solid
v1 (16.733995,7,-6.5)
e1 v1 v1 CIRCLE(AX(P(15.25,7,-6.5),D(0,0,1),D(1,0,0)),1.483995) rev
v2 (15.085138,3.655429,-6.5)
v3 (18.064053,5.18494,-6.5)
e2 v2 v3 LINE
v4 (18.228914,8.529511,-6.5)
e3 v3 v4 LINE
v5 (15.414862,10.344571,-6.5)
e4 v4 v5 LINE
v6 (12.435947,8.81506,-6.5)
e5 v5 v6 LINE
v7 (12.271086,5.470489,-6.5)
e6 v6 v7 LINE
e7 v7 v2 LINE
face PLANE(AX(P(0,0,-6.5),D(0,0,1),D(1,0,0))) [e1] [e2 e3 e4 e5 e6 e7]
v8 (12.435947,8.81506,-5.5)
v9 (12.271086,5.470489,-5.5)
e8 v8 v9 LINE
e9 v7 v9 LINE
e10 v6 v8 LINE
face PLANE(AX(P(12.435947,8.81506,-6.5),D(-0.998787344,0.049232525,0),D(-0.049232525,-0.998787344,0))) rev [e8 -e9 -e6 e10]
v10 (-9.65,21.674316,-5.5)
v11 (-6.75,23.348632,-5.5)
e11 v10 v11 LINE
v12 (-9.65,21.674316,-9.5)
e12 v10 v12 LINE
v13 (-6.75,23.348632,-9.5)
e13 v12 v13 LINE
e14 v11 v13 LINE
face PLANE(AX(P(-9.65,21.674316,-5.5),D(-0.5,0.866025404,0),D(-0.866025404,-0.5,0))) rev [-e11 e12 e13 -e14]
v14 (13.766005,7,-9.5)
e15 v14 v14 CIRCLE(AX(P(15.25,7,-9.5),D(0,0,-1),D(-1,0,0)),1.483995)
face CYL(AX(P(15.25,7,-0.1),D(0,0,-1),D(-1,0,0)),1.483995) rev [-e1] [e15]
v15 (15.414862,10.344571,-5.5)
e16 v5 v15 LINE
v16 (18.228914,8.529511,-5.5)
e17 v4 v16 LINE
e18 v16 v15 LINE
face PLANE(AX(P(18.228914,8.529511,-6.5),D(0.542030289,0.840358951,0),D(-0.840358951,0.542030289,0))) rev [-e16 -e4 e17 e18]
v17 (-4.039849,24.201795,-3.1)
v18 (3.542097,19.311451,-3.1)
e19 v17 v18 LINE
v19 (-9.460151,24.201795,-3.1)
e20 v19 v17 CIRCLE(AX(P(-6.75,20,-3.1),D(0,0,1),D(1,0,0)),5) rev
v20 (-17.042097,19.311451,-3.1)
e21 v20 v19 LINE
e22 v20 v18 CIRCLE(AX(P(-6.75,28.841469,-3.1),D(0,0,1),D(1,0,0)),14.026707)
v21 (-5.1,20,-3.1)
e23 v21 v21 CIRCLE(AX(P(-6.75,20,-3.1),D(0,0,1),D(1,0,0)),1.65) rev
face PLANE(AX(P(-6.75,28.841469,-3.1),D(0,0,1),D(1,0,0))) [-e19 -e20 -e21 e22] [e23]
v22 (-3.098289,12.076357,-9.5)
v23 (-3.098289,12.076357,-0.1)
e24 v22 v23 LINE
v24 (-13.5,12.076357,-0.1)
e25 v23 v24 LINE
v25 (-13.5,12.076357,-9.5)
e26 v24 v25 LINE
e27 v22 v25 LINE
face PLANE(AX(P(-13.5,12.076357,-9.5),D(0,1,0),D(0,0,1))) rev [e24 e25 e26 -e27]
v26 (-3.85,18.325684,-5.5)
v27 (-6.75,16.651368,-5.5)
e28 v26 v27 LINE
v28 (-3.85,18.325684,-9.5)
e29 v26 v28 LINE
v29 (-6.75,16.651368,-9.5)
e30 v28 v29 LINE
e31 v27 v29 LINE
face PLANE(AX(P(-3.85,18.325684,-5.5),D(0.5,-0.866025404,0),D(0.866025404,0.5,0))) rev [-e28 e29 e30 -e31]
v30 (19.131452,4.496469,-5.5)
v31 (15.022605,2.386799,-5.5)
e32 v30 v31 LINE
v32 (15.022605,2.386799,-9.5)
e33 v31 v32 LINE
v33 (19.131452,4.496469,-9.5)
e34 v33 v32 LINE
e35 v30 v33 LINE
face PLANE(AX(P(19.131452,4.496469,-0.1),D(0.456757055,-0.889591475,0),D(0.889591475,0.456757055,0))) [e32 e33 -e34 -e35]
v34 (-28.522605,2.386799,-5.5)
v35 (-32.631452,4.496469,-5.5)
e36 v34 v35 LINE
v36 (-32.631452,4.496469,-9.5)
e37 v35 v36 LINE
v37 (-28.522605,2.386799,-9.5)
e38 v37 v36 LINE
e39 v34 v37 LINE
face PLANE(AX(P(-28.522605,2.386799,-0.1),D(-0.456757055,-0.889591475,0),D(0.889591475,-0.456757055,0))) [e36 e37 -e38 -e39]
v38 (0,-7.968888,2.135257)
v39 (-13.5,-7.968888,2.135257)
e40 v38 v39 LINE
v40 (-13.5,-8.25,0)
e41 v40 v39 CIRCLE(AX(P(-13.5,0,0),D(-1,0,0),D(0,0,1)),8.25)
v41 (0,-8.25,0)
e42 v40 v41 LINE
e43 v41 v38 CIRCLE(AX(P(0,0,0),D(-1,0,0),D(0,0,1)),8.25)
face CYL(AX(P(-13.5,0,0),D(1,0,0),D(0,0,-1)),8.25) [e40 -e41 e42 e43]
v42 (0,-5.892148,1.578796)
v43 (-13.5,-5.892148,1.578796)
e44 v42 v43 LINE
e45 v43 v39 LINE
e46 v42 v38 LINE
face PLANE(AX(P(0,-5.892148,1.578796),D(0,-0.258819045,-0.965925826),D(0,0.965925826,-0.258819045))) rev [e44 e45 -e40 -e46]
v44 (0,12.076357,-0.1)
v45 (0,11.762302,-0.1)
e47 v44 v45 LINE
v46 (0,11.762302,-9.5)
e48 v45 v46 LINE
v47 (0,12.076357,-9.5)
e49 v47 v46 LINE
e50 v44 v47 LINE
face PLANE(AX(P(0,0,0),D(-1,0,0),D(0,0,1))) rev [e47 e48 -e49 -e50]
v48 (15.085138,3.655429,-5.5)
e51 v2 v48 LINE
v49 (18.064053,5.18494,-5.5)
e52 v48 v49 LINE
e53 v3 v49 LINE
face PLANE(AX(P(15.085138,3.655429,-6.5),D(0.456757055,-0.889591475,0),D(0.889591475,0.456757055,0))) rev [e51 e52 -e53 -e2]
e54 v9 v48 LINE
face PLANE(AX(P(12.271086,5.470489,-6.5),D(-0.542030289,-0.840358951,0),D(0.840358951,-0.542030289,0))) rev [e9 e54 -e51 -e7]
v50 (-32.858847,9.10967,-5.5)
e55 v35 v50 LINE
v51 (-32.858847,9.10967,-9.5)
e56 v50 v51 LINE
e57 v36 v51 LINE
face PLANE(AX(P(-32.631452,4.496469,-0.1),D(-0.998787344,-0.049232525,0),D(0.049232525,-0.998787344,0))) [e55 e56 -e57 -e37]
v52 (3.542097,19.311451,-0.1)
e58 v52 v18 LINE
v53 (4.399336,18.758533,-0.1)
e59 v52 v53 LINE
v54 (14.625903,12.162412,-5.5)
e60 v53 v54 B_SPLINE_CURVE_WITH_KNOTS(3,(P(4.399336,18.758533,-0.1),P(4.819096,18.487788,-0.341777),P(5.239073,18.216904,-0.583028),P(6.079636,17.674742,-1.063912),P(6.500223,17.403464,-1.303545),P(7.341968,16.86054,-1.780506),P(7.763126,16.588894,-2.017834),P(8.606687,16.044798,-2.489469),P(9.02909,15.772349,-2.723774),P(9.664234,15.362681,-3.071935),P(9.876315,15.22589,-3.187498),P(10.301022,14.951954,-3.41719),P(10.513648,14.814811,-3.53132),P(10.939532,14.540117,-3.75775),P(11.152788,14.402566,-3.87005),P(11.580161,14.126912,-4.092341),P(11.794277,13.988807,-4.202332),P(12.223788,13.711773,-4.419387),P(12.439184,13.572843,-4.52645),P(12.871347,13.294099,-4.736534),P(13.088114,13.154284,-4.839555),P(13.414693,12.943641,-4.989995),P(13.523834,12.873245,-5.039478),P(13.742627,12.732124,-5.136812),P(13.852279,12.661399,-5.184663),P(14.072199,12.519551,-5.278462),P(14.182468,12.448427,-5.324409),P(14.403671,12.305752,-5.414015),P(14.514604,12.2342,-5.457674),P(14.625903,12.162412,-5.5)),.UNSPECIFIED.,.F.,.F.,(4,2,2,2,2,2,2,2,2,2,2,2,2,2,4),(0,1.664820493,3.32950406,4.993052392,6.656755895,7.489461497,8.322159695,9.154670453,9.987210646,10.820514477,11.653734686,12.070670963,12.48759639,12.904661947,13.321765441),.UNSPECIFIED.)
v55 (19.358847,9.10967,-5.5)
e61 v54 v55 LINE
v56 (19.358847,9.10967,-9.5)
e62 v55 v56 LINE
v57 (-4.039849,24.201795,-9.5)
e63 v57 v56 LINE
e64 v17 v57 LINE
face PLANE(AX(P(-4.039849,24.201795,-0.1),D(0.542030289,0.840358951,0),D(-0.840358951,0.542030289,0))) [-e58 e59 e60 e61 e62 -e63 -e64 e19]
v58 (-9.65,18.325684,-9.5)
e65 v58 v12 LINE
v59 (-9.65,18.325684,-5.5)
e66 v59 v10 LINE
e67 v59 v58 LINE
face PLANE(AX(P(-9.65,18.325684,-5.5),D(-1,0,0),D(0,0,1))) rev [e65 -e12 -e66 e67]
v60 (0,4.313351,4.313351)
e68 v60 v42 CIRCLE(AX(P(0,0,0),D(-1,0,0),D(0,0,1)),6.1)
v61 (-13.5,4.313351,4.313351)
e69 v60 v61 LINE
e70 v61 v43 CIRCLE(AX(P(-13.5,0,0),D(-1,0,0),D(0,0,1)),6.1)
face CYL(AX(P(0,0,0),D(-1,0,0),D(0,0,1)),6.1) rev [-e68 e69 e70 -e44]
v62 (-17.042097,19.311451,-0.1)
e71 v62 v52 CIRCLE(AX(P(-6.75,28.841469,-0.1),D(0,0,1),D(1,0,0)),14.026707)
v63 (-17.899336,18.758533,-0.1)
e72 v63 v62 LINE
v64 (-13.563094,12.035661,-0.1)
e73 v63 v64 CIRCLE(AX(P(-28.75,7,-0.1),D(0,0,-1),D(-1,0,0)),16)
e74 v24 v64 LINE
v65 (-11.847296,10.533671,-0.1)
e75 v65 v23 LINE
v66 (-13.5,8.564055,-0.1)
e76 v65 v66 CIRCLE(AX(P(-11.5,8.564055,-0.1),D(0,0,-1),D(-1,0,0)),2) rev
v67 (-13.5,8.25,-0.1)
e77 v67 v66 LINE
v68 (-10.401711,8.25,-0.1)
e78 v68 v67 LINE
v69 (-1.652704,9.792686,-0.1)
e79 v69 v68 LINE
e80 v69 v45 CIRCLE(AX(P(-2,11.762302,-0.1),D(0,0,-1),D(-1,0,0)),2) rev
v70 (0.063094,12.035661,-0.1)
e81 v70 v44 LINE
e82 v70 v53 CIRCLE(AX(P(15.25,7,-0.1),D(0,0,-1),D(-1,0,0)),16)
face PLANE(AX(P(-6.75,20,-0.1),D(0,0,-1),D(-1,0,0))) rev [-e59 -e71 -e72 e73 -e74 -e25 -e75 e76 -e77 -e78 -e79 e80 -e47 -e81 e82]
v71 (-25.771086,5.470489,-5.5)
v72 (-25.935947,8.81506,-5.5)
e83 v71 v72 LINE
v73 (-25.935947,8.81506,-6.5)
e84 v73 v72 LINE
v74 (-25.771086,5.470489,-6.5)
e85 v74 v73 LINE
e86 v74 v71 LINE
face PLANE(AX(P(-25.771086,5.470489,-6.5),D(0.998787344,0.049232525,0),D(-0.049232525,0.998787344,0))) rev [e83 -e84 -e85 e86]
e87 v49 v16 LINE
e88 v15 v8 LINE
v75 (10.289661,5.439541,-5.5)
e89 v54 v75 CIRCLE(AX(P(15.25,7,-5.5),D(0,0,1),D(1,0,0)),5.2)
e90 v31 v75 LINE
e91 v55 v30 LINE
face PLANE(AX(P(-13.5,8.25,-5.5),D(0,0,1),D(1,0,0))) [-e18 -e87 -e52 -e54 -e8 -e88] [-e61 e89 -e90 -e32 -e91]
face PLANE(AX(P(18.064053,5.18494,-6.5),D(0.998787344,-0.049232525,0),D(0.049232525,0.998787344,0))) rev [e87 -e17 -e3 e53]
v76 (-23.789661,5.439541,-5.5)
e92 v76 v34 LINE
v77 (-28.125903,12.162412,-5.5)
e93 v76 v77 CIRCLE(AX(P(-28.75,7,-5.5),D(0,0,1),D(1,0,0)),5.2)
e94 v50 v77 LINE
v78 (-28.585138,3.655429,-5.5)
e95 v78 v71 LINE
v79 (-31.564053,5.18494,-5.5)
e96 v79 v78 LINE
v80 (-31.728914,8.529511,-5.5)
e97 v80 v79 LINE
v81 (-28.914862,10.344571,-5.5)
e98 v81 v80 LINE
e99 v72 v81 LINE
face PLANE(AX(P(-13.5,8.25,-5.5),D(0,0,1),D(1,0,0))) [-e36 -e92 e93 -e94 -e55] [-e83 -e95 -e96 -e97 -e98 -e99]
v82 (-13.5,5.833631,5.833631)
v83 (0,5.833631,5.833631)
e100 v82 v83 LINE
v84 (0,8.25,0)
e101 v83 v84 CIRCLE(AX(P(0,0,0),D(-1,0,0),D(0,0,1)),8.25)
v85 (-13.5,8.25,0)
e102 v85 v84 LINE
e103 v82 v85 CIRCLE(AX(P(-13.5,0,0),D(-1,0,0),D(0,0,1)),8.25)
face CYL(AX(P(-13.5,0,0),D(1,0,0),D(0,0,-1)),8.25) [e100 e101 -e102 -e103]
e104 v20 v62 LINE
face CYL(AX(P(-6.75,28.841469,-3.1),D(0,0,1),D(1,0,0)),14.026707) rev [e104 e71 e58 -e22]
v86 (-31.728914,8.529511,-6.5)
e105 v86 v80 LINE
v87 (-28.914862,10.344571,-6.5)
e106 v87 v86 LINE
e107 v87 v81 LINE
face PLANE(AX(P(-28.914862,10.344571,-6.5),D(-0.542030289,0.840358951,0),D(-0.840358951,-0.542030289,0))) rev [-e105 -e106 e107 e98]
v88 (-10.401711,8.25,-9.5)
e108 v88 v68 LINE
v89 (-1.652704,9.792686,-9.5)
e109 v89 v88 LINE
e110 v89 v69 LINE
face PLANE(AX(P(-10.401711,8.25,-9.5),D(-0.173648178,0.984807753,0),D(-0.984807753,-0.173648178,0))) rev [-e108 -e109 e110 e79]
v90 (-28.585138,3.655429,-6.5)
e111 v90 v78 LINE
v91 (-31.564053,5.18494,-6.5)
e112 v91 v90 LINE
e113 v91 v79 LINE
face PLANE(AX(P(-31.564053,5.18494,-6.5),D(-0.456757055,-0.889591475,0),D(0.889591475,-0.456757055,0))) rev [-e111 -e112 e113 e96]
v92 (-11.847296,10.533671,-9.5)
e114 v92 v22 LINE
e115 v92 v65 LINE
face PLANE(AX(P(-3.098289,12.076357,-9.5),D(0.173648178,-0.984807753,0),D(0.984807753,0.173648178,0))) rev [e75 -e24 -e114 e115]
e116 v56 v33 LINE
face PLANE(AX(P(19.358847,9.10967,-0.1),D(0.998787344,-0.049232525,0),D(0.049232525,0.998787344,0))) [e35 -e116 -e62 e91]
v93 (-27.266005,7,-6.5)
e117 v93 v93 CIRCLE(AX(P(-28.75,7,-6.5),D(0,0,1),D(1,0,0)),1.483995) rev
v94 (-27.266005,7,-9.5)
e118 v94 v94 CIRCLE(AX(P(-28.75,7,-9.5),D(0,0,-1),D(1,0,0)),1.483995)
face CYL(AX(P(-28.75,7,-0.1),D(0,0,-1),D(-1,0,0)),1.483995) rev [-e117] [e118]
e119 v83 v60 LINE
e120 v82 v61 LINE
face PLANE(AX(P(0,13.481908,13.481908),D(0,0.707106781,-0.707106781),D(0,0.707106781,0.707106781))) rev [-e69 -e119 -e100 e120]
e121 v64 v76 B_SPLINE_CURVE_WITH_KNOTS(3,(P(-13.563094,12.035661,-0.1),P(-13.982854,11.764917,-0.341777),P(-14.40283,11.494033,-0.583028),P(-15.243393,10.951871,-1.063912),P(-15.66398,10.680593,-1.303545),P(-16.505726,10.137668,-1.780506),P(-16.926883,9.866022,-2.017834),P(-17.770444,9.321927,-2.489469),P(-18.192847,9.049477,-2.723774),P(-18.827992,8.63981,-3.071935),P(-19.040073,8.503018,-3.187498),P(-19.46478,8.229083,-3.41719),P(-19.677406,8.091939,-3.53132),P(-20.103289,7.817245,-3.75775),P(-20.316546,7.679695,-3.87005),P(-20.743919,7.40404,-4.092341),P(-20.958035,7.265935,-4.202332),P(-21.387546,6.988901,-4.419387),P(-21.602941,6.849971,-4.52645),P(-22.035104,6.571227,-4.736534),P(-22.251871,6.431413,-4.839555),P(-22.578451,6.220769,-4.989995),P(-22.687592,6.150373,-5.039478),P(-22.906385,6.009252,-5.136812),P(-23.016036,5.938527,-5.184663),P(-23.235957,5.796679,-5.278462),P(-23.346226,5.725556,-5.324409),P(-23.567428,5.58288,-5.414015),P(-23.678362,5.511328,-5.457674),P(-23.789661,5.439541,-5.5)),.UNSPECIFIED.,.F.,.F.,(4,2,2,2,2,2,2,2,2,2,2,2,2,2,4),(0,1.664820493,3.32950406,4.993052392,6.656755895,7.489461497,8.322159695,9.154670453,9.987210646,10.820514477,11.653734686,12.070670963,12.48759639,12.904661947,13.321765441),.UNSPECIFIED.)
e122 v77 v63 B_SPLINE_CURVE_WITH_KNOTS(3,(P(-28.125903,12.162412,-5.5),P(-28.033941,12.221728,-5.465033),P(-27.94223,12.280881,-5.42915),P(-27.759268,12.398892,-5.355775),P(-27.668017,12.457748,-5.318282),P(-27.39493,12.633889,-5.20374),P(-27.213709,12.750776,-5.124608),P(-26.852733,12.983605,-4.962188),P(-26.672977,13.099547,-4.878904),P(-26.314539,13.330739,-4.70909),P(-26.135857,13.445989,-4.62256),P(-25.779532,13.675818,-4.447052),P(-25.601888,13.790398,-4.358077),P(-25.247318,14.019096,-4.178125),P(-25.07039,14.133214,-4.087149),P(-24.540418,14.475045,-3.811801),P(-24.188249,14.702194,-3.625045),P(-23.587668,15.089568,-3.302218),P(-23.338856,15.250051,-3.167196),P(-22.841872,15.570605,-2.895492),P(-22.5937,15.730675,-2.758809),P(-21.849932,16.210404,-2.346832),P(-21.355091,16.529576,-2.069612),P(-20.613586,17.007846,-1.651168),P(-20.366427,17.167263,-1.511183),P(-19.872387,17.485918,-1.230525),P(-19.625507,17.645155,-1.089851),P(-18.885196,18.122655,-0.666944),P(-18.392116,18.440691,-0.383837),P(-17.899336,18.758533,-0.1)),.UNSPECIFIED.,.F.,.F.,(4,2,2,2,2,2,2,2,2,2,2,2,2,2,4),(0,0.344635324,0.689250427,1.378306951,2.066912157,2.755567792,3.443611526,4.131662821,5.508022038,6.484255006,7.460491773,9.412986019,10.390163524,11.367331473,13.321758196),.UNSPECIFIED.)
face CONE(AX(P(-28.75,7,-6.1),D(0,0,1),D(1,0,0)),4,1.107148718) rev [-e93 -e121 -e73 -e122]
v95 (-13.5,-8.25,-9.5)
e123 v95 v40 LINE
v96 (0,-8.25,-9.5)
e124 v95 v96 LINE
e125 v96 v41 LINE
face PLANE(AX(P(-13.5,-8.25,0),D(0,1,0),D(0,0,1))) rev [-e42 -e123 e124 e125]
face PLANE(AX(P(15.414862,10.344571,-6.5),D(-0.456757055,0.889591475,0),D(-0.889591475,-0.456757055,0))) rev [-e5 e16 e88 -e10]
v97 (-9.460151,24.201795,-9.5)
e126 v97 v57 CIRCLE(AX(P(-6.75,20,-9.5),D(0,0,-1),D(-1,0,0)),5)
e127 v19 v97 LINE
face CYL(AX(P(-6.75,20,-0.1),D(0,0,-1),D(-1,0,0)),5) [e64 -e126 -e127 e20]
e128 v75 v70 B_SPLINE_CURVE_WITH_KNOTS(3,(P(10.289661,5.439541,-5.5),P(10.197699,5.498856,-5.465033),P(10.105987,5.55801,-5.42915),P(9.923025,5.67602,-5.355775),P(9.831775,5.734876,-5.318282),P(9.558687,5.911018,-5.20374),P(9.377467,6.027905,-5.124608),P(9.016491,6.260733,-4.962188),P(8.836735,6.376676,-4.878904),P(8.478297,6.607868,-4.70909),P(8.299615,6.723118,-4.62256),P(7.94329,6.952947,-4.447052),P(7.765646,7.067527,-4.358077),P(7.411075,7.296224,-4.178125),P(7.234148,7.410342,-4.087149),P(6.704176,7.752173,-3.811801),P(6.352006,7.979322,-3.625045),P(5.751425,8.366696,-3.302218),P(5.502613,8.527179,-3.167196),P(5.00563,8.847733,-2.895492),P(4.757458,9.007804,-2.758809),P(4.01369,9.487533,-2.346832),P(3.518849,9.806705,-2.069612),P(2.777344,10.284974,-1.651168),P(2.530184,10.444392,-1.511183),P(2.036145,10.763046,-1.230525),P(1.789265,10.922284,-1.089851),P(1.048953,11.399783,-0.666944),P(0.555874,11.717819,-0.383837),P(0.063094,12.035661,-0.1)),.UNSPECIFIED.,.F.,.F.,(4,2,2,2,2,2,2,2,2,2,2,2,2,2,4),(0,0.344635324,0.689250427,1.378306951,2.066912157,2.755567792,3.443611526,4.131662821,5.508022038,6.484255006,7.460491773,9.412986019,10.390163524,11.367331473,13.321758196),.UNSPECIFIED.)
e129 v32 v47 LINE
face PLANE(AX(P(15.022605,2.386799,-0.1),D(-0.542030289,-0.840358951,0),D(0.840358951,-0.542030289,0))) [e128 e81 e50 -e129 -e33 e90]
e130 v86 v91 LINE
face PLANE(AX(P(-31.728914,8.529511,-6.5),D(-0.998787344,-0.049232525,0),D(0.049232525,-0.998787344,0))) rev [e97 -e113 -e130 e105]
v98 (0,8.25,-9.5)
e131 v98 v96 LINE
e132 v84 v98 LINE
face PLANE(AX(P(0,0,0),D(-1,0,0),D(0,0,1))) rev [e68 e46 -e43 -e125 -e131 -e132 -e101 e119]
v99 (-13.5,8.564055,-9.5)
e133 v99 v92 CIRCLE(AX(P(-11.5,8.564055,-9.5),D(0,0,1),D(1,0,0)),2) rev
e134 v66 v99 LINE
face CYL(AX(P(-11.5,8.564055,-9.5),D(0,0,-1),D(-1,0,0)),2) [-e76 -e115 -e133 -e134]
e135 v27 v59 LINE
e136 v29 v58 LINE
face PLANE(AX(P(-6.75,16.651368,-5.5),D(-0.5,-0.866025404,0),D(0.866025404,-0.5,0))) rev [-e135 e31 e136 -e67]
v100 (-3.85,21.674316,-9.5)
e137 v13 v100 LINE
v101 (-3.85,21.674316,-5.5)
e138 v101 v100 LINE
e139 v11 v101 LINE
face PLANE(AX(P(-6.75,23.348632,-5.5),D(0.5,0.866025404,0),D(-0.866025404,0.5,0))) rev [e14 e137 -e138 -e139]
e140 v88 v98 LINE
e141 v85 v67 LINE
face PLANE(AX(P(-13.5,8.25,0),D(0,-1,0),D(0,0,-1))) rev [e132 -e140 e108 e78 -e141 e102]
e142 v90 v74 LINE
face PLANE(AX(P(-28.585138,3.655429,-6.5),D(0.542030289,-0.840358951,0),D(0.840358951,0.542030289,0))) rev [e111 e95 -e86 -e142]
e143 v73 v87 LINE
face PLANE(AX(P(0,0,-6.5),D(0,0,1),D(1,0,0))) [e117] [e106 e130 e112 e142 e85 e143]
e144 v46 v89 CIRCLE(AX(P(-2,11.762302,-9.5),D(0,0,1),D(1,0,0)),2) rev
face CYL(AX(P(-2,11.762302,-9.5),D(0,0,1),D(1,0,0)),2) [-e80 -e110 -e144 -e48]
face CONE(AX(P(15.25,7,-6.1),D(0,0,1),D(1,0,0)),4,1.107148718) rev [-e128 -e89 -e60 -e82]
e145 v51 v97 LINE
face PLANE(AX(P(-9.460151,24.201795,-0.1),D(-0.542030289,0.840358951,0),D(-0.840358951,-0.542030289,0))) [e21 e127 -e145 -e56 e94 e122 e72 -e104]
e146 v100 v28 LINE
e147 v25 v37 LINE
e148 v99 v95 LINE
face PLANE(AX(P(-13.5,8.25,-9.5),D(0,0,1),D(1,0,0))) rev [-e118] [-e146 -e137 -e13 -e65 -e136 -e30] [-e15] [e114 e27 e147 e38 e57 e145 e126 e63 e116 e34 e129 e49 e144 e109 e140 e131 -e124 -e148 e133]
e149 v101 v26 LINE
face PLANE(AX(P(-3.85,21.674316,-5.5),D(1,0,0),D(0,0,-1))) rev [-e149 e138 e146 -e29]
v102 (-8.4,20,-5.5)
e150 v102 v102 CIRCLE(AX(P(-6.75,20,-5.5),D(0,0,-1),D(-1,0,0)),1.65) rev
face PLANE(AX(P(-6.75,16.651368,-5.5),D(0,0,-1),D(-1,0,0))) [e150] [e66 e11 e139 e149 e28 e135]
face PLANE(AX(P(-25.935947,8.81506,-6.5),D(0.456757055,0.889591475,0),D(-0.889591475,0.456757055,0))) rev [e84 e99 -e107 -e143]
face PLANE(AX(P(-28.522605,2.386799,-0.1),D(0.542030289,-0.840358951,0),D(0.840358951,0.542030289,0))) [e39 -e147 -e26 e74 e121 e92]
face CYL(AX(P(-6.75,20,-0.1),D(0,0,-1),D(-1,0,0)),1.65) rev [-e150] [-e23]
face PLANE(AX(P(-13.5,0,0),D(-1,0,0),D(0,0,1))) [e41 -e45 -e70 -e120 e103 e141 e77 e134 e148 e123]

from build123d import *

# Parameters (mm, degrees)
BOSS_EXTRUDE1_DEPTH = 13.5
CUT_EXTRUDE1_DEPTH  = 19.454335534
SKETCH14_R          = 1.65
SKETCH14_R_2        = 1.483994527
BOSS_EXTRUDE3_DEPTH = 9.4
CUT_EXTRUDE7_DEPTH  = 43.344584395
FILLET2_R           = 2
CUT_EXTRUDE8_DEPTH  = 4
CUT_EXTRUDE9_DEPTH  = 5.4
CHAMFER2_SIZE       = 12
CHAMFER2_SIZE_2     = 6
CHAMFER3_SIZE       = 6
CHAMFER3_SIZE_2     = 12
SKETCH18_R          = 14.026707194
CUT_EXTRUDE10_DEPTH = 3
CUT_EXTRUDE11_DEPTH = 1


with BuildPart() as part:
    # Sketch1 → Boss-Extrude1 (new body)
    with BuildSketch(Plane.ZY):
        with BuildLine():
            Line((-9.5, 8.25), (-9.5, -8.25))
            Line((-9.5, -8.25), (0, -8.25))
            ThreePointArc((0, -8.25), (8.25, 0), (0, 8.25))
            Line((0, 8.25), (-9.5, 8.25))
        make_face()
    extrude(amount=BOSS_EXTRUDE1_DEPTH)

    # Sketch7 → Cut-Extrude1 (cut, through all)
    with BuildSketch(Plane.ZY.offset(13.5)):
        with BuildLine():
            Line((13.481907846, 13.481907846), (4.313351365, 4.313351365))
            ThreePointArc((4.313351365, 4.313351365), (-5.89214754, 1.578796175), (1.578796175, -5.89214754))
            Line((1.578796175, -5.89214754), (4.934720763, -18.416628609))
            Line((4.934720763, -18.416628609), (13.481907846, 13.481907846))
        make_face()
    extrude(amount=-CUT_EXTRUDE1_DEPTH, mode=Mode.SUBTRACT)

    # Sketch14 → Boss-Extrude3 (add)
    with BuildSketch(Plane(origin=(0, 0, -9.5), x_dir=(-1, 0, 0), z_dir=(0, 0, -1))):
        with BuildLine():
            Line((4.039848555, 24.201794753), (-19.358847021, 9.109670469))
            Line((-19.358847021, 9.109670469), (-19.131451731, 4.496469334))
            Line((-19.131451731, 4.496469334), (-15.022604709, 2.386798865))
            Line((-15.022604709, 2.386798865), (0, 12.07635684))
            Line((0, 12.07635684), (0, 8.25))
            Line((0, 8.25), (13.5, 8.25))
            Line((13.5, 8.25), (13.5, 12.07635684))
            Line((13.5, 12.07635684), (28.522604709, 2.386798865))
            Line((28.522604709, 2.386798865), (32.631451731, 4.496469334))
            Line((32.631451731, 4.496469334), (32.858847021, 9.109670469))
            Line((32.858847021, 9.109670469), (9.460151445, 24.201794753))
            ThreePointArc((9.460151445, 24.201794753), (6.75, 25), (4.039848555, 24.201794753))
        make_face()
        with Locations((6.75, 20)):
            Circle(SKETCH14_R, mode=Mode.SUBTRACT)
        with Locations((-15.25, 7)):
            Circle(SKETCH14_R_2, mode=Mode.SUBTRACT)
        with Locations(Location((28.75, 7, 0), (0, 0, 180))):
            Circle(SKETCH14_R_2, mode=Mode.SUBTRACT)
    extrude(amount=-BOSS_EXTRUDE3_DEPTH)

    # Sketch15 → Cut-Extrude7 (cut, through all)
    with BuildSketch(Plane.XY.offset(-0.1)):
        Polygon((0, 8.25), (-10.401710887, 8.25), (0, 10.084102275), align=None)
        Polygon((-13.5, 10.242254565), (-13.5, 12.07635684), (-3.098289113, 12.07635684), align=None)
    extrude(amount=-CUT_EXTRUDE7_DEPTH, mode=Mode.SUBTRACT)

    # Fillet2
    fillet2_edges = [part.edges().sort_by_distance(p)[0] for p in [
        (0, 10.084102275, -4.8),
        (-13.5, 10.242254565, -4.8),
    ]]
    fillet(fillet2_edges, radius=FILLET2_R)

    # Sketch16 → Cut-Extrude8 (cut)
    with BuildSketch(Plane(origin=(0, 0, -9.5), x_dir=(-1, 0, 0), z_dir=(0, 0, -1))):
        Polygon((6.75, 16.651368439), (9.65, 18.325684219), (9.65, 21.674315781), (6.75, 23.348631561), (3.85, 21.674315781), (3.85, 18.325684219), align=None)
    extrude(amount=-CUT_EXTRUDE8_DEPTH, mode=Mode.SUBTRACT)

    # Sketch17 → Cut-Extrude9 (cut)
    with BuildSketch(Plane.XY.offset(-0.1)):
        with BuildLine():
            Line((19.131451731, 4.496469334), (19.358847021, 9.109670469))
            Line((19.358847021, 9.109670469), (17.418121156, 10.361435802))
            ThreePointArc((17.418121156, 10.361435802), (11.888564198, 9.168121156), (13.081878844, 3.638564198))
            Line((13.081878844, 3.638564198), (15.022604709, 2.386798865))
            Line((15.022604709, 2.386798865), (19.131451731, 4.496469334))
        make_face()
        with BuildLine():
            Line((-32.631451731, 4.496469334), (-28.522604709, 2.386798865))
            Line((-28.522604709, 2.386798865), (-26.581878844, 3.638564198))
            ThreePointArc((-26.581878844, 3.638564198), (-25.388564198, 9.168121156), (-30.918121156, 10.361435802))
            Line((-30.918121156, 10.361435802), (-32.858847021, 9.109670469))
            Line((-32.858847021, 9.109670469), (-32.631451731, 4.496469334))
        make_face()
    extrude(amount=-CUT_EXTRUDE9_DEPTH, mode=Mode.SUBTRACT)

    # Chamfer2
    # the kernel refuses this chamfer: 12, 6 mm, written as the material it takes off along each edge
    with BuildSketch(Plane(origin=(-28.75, 7, -0.1), x_dir=(-0.8386519680093931, -0.5446676753342096, 0), z_dir=(-0.5446676753342096, 0.8386519680093931, 0))) as chamfer2_piece_1_section:
        Polygon((4 + CHAMFER2_SIZE, 0), (4, -CHAMFER2_SIZE_2), (4, 0), align=None)
    chamfer2_piece_1 = revolve(axis=Axis((-28.75, 7, -0.1), (0, 0, 1)), revolution_arc=359.64, mode=Mode.PRIVATE)
    chamfer2_piece_1 = split(chamfer2_piece_1, bisect_by=Plane(origin=(-24.520519127, 4.968138188, -1.544016366), z_dir=(-0.5420302889814643, 0.8403589505840171, 0)), keep=Keep.TOP, mode=Mode.PRIVATE)
    chamfer2_piece_1 = split(chamfer2_piece_1, bisect_by=Plane(origin=(-24.679235885, 5.214211241, -5.5), z_dir=(0, 0, 1)), keep=Keep.TOP, mode=Mode.PRIVATE)
    add(chamfer2_piece_1, mode=Mode.SUBTRACT)

    # Chamfer3
    # the kernel refuses this chamfer: 12, 6 mm, written as the material it takes off along each edge
    with BuildSketch(Plane(origin=(15.25, 7, -0.1), x_dir=(0.8420576391550663, -0.5393875530085916, 0), z_dir=(-0.5393875530085916, -0.8420576391550663, 0))) as chamfer3_piece_1_section:
        Polygon((4, -CHAMFER3_SIZE), (4 + CHAMFER3_SIZE_2, 0), (4, 0), align=None)
    chamfer3_piece_1 = revolve(axis=Axis((15.25, 7, -0.1), (0, 0, 1)), revolution_arc=359.64, mode=Mode.PRIVATE)
    chamfer3_piece_1 = split(chamfer3_piece_1, bisect_by=Plane(origin=(8.890128565, 11.795128101, -5.5), z_dir=(0, 0, 1)), keep=Keep.TOP, mode=Mode.PRIVATE)
    chamfer3_piece_1 = split(chamfer3_piece_1, bisect_by=Plane(origin=(0, 11.795128101, -1.99911645), z_dir=(1, 0, 0)), keep=Keep.TOP, mode=Mode.PRIVATE)
    add(chamfer3_piece_1, mode=Mode.SUBTRACT)

    # Sketch18 → Cut-Extrude10 (cut)
    with BuildSketch(Plane.XY.offset(-0.1)):
        with Locations((-6.75, 28.841468874)):
            Circle(SKETCH18_R)
    extrude(amount=-CUT_EXTRUDE10_DEPTH, mode=Mode.SUBTRACT)

    # Sketch19 → Cut-Extrude11 (cut)
    with BuildSketch(Plane.XY.offset(-5.5)):
        Polygon((-31.564052505, 5.184940267), (-28.585138414, 3.655429177), (-25.77108591, 5.47048891), (-25.935947495, 8.815059733), (-28.914861586, 10.344570823), (-31.72891409, 8.52951109), align=None)
        Polygon((18.064052505, 5.184940267), (18.22891409, 8.52951109), (15.414861586, 10.344570823), (12.435947495, 8.815059733), (12.27108591, 5.47048891), (15.085138414, 3.655429177), align=None)
    extrude(amount=-CUT_EXTRUDE11_DEPTH, mode=Mode.SUBTRACT)


solid = part.part
